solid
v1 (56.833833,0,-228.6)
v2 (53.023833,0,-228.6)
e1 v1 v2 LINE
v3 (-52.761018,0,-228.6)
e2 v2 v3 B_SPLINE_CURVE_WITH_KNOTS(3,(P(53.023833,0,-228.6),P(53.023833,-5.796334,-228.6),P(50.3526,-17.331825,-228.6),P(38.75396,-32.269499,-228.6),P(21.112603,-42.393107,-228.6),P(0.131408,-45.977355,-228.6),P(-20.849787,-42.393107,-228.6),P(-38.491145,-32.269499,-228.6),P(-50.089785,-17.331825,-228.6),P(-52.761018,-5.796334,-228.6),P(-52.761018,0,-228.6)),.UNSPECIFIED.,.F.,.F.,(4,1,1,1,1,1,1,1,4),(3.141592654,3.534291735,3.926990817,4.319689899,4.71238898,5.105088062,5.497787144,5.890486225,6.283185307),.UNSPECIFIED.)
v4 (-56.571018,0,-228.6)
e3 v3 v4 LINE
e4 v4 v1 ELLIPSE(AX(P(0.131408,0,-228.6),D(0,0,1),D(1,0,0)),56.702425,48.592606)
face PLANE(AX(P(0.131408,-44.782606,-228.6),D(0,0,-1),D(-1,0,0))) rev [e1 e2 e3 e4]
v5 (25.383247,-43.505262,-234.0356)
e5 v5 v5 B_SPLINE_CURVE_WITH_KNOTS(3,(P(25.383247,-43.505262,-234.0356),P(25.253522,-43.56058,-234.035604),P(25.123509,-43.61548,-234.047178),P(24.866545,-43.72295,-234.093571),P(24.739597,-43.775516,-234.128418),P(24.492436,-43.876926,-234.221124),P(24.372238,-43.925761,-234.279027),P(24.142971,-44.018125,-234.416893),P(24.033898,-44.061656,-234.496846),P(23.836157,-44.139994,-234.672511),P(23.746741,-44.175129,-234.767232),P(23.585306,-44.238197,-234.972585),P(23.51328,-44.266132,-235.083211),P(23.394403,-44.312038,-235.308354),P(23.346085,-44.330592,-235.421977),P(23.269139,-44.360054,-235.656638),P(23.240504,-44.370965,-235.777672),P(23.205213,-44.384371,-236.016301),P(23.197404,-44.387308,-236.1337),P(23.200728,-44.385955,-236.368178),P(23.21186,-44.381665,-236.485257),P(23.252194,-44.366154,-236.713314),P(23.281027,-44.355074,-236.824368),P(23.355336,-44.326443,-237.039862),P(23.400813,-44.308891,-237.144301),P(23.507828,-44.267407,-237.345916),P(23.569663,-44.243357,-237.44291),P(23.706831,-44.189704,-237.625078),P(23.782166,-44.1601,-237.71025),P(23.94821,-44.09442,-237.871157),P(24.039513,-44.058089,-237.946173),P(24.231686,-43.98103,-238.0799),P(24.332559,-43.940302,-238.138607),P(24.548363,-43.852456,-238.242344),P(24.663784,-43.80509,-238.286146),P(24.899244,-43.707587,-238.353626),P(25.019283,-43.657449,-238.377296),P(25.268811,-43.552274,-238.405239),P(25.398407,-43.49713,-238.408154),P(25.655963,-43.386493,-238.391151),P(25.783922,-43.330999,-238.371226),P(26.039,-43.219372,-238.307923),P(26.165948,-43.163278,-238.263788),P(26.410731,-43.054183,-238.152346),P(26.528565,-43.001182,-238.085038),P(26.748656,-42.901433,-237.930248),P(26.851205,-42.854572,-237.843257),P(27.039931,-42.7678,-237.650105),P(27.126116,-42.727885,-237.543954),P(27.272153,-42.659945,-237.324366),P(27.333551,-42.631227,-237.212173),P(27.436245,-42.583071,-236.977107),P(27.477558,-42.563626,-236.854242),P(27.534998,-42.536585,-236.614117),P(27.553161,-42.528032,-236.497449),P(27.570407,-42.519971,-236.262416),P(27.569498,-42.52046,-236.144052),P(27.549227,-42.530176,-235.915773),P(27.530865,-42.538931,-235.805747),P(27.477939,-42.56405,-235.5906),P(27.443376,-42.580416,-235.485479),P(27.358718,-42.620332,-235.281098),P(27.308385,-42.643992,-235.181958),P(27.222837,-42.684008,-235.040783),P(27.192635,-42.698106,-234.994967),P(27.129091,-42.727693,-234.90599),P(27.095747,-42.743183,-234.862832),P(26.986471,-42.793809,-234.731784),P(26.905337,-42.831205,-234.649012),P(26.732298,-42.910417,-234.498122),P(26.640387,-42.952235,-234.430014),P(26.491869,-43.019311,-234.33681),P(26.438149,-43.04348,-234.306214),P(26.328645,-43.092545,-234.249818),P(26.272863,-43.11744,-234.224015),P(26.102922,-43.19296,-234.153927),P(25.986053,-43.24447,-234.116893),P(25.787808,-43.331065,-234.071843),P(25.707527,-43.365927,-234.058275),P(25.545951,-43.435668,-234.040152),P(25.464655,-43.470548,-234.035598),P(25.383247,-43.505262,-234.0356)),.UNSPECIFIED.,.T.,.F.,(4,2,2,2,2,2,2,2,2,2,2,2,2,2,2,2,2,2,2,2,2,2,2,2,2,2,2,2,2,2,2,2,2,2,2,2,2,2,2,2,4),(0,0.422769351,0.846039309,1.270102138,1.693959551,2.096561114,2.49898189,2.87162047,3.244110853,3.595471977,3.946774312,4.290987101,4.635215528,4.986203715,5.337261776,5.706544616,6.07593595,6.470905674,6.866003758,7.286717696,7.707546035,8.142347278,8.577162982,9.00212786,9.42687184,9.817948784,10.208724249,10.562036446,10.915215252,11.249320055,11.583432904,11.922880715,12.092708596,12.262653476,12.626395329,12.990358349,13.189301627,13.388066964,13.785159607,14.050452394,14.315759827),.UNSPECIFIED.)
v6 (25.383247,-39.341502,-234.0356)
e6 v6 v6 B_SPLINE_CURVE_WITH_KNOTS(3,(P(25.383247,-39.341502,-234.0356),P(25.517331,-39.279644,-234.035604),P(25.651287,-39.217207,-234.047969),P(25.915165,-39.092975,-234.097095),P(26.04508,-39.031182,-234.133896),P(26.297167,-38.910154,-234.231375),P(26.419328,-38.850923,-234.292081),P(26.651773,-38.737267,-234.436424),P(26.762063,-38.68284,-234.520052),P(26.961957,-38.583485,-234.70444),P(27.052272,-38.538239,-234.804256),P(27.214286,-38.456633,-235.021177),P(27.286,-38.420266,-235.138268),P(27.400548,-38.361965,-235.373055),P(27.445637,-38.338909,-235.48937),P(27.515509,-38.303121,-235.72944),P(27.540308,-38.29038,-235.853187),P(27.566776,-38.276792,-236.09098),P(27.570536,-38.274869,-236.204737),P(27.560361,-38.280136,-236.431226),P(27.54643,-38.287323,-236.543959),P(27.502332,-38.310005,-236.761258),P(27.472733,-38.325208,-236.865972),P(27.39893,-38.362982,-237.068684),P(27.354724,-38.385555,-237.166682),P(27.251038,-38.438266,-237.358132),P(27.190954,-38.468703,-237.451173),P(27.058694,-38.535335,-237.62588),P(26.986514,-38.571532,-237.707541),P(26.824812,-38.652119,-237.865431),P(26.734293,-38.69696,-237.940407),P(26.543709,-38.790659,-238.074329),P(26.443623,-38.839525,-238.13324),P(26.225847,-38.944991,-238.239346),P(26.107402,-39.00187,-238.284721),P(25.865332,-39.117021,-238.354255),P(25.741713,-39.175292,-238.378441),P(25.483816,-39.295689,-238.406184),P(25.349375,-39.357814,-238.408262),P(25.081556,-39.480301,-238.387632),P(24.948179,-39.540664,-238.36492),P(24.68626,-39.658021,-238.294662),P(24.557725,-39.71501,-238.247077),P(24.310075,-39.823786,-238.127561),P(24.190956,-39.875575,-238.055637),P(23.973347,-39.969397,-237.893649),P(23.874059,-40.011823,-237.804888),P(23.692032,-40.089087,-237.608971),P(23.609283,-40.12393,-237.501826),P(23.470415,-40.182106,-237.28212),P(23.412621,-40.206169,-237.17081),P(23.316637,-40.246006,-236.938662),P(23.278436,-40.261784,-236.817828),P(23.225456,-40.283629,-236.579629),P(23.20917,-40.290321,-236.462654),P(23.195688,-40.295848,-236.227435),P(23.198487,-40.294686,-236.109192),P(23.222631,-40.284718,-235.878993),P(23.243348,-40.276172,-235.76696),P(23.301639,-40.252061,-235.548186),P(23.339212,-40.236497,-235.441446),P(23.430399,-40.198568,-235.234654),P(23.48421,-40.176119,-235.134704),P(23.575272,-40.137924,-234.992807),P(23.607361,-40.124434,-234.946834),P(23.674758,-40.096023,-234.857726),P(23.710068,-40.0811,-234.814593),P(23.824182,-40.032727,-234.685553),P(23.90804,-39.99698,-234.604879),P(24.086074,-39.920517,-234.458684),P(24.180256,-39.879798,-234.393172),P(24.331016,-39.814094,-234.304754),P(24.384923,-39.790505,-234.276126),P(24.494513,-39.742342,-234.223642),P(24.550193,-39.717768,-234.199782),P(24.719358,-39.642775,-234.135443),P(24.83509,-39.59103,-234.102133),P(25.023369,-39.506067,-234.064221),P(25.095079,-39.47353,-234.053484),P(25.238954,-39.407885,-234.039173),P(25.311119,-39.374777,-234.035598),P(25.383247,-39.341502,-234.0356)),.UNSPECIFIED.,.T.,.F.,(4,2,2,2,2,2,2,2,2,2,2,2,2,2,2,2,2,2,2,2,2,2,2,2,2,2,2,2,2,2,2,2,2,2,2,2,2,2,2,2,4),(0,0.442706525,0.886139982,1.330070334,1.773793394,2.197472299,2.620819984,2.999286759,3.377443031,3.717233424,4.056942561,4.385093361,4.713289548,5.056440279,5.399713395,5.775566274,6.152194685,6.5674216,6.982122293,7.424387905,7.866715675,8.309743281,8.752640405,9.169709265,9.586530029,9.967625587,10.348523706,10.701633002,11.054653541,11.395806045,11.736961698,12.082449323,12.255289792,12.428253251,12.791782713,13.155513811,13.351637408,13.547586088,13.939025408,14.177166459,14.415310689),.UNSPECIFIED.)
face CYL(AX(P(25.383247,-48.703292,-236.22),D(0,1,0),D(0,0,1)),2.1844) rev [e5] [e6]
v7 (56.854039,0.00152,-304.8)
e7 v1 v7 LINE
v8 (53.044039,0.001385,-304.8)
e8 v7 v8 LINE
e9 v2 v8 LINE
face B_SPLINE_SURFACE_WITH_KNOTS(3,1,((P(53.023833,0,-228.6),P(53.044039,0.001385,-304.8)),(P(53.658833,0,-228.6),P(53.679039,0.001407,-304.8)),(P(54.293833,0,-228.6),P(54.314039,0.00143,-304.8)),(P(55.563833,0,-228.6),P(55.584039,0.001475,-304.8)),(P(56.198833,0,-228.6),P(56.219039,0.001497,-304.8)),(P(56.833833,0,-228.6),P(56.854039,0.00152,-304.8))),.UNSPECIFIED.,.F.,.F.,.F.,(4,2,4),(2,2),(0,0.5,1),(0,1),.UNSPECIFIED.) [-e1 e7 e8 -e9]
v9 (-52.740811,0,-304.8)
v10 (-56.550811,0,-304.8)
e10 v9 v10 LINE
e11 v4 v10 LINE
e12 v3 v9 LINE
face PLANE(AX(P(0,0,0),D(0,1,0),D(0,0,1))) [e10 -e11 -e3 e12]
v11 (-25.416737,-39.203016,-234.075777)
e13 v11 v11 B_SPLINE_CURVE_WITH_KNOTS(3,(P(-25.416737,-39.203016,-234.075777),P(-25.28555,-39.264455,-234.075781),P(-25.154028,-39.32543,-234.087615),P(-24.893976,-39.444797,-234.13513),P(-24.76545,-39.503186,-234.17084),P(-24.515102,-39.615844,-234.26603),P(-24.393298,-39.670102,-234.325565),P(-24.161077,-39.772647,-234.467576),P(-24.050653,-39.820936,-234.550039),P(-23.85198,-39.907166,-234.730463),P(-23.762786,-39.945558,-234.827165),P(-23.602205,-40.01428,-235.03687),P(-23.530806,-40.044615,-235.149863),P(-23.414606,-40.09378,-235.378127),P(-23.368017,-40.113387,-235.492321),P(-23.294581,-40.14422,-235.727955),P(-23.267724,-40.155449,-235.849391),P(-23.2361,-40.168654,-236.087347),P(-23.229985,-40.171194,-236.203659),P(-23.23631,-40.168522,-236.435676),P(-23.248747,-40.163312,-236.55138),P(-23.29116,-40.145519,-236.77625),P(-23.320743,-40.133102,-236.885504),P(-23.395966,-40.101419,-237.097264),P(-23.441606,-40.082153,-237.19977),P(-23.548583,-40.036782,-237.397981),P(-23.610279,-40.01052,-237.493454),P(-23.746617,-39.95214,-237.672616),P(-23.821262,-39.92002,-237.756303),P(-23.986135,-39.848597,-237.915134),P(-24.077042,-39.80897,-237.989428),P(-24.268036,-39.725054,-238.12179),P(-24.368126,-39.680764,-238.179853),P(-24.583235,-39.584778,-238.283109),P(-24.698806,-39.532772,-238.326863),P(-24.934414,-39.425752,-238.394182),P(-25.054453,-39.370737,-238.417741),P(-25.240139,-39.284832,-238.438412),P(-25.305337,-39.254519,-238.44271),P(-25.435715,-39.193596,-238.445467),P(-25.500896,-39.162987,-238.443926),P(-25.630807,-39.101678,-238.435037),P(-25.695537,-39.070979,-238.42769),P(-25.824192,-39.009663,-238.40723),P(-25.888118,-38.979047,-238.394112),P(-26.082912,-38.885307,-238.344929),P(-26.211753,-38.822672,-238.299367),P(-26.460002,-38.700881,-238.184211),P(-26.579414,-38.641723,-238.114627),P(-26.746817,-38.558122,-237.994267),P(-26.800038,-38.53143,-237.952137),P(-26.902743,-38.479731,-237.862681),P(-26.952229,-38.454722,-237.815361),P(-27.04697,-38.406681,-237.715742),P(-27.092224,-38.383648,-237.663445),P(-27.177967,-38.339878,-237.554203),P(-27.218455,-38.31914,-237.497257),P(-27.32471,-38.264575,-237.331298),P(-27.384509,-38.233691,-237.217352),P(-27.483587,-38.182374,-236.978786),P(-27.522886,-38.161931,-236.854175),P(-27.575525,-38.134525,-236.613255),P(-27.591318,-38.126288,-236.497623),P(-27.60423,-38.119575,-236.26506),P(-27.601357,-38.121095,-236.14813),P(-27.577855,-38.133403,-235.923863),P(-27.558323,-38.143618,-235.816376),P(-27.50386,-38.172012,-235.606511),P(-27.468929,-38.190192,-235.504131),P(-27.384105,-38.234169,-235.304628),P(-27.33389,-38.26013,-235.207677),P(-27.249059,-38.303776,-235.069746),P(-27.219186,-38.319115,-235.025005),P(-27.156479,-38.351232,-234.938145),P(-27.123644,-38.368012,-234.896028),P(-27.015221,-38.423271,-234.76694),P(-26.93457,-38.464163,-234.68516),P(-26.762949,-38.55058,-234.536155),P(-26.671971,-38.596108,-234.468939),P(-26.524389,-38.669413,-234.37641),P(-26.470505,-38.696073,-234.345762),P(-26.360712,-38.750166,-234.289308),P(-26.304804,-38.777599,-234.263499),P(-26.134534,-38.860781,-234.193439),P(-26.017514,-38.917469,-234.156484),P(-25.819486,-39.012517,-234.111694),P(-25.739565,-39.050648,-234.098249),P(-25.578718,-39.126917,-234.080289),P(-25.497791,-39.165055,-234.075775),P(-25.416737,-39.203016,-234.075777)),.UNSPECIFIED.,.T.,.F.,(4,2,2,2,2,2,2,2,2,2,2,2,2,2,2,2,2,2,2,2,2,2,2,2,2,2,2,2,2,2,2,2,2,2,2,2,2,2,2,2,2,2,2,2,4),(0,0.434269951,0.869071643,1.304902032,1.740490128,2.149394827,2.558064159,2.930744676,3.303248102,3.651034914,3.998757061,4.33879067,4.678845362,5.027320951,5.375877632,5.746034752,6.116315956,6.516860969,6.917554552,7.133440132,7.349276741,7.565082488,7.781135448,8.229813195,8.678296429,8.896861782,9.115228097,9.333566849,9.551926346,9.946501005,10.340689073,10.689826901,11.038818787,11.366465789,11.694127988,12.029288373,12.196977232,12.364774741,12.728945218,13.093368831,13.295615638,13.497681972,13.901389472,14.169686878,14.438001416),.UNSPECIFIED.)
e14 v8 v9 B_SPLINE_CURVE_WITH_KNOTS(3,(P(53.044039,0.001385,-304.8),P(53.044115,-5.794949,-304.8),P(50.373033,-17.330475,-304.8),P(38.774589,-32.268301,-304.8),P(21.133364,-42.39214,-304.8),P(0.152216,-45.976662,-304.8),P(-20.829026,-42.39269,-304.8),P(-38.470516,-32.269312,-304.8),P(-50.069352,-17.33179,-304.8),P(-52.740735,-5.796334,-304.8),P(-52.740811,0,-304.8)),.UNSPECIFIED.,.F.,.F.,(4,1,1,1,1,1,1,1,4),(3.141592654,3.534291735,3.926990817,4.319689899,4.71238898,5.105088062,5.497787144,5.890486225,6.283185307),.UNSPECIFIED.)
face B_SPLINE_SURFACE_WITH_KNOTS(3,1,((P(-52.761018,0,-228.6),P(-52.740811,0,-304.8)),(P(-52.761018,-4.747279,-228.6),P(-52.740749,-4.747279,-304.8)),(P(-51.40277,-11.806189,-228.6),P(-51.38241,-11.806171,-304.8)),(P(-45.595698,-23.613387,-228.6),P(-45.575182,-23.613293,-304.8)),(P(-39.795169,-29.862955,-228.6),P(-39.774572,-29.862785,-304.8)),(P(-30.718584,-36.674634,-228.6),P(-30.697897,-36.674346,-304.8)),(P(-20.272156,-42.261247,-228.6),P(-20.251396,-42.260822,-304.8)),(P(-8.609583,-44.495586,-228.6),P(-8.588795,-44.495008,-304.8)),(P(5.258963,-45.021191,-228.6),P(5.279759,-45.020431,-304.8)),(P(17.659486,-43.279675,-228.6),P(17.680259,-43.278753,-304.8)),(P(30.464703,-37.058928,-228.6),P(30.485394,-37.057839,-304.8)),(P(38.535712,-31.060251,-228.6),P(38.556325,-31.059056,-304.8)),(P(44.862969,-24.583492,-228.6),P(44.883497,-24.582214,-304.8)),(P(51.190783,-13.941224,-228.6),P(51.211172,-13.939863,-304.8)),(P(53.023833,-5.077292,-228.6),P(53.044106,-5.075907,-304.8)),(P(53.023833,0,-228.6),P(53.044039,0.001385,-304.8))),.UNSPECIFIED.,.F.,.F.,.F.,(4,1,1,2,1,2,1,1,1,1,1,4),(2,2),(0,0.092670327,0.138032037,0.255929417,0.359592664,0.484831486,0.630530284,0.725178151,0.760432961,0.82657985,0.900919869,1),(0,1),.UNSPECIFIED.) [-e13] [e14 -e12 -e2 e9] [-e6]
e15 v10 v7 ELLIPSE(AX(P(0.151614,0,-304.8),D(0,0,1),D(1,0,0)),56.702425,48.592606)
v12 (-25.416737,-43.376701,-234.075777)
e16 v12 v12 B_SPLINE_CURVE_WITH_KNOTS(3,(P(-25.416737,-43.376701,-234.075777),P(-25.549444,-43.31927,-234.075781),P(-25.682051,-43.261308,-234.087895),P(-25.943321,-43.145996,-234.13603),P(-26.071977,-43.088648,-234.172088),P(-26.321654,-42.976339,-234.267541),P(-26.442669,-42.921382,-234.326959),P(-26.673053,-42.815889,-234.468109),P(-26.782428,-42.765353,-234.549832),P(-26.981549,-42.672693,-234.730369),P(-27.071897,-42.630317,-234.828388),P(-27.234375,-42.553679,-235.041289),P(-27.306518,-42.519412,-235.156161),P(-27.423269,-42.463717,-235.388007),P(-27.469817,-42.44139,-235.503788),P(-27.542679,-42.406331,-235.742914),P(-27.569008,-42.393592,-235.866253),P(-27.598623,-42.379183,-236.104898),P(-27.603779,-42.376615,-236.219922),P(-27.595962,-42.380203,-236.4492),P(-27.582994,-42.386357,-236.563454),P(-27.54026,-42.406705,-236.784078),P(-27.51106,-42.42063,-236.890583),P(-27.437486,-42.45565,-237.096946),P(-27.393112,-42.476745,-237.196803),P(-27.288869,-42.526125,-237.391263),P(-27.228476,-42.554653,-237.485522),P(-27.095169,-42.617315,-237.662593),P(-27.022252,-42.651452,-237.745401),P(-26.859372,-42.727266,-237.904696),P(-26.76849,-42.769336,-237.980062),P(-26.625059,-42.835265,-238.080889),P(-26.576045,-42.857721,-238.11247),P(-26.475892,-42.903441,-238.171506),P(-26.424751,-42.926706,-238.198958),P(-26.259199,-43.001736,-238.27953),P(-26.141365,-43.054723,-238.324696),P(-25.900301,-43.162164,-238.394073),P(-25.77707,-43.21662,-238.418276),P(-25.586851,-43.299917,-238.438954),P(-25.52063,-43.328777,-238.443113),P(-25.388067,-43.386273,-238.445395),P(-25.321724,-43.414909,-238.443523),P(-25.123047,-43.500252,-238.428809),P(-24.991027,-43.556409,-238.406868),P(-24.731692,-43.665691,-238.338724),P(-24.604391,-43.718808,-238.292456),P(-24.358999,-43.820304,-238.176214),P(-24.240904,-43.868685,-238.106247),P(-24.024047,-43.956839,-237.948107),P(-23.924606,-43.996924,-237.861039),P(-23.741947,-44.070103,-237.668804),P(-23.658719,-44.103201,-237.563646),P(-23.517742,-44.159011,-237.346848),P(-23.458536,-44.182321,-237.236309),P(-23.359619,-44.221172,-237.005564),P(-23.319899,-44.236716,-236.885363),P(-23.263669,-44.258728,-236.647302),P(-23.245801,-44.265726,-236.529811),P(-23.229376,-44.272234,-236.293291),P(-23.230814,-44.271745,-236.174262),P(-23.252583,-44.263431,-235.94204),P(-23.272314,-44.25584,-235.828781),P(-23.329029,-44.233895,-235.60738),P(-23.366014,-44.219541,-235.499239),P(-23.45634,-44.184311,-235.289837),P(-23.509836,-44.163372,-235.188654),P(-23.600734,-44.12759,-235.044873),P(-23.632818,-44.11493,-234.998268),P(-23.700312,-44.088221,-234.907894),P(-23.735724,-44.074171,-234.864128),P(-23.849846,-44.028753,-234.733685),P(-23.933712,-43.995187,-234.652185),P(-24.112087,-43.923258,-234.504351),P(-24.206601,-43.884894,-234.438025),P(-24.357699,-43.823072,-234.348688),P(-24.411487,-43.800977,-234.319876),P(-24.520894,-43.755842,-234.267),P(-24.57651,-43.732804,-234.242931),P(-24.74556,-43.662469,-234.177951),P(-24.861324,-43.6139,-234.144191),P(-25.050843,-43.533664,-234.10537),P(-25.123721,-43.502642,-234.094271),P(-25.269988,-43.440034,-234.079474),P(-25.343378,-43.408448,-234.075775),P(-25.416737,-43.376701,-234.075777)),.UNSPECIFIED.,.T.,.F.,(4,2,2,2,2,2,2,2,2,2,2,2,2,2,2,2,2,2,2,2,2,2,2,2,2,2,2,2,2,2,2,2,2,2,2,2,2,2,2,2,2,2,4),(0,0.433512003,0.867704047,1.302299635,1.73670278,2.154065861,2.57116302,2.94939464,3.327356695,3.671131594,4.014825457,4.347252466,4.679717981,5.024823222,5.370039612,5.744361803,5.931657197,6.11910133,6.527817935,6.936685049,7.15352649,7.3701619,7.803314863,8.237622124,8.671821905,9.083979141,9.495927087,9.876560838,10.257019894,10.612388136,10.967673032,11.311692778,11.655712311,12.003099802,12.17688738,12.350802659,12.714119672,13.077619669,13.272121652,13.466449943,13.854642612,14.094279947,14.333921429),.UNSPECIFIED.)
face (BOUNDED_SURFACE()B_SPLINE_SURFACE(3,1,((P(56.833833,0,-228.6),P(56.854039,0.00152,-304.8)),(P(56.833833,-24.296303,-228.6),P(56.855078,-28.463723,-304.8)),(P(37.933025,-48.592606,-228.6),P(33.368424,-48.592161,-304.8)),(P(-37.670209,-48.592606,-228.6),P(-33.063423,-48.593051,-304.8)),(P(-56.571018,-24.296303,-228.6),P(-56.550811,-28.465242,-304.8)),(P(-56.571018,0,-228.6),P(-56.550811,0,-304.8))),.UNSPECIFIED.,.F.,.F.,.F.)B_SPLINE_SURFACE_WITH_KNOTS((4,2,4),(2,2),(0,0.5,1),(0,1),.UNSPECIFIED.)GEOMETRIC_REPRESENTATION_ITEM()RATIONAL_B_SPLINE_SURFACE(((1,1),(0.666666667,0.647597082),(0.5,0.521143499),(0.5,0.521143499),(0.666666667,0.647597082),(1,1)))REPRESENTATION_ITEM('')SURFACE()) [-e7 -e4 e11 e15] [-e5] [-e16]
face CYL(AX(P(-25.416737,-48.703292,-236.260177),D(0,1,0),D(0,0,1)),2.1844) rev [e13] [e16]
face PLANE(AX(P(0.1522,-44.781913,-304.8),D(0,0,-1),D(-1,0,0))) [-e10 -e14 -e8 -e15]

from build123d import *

# Parameters (mm, degrees)
SKETCH18_R         = 2.1844
CUT_EXTRUDE1_DEPTH = 314.841780485


with BuildPart() as part:
    # Loft1: read off the stored shape, not the designer's step
    # Loft1: loft between two sections, ruled curve by curve
    loft1_from = [
        Edge.make_bspline([(56.833832956, 0, -228.6), (56.833832956, -24.296302856, -228.6), (37.93302454, -48.592605712, -228.6), (-37.670209127, -48.592605712, -228.6), (-56.571017544, -24.296302856, -228.6), (-56.571017544, 0, -228.6)], [0, 0, 0, 0, 0.5, 0.5, 1, 1, 1, 1], 3, [1, 0.666666667, 0.5, 0.5, 0.666666667, 1]),
        Edge.make_bspline([(-52.761017544, 0, -228.6), (-52.761017544, -4.747279447, -228.6), (-51.402770393, -11.806188932, -228.6), (-45.595697561, -23.613386766, -228.6), (-39.795169121, -29.862955228, -228.6), (-30.718583767, -36.674634262, -228.6), (-20.272155915, -42.261246959, -228.6), (-8.609583282, -44.495586175, -228.6), (5.258963144, -45.021190556, -228.6), (17.65948625, -43.279675379, -228.6), (30.464702909, -37.058928058, -228.6), (38.535712181, -31.060250812, -228.6), (44.862969288, -24.583491802, -228.6), (51.190783343, -13.941223772, -228.6), (53.023832956, -5.077291503, -228.6), (53.023832956, 0, -228.6)], [0, 0, 0, 0, 0.092670327, 0.138032037, 0.255929417, 0.255929417, 0.359592664, 0.484831486, 0.484831486, 0.630530284, 0.725178151, 0.760432961, 0.82657985, 0.900919869, 1, 1, 1, 1], 3),
        Edge.make_bspline([(53.023832956, 0, -228.6), (53.658832956, 0, -228.6), (54.293832956, 0, -228.6), (55.563832956, 0, -228.6), (56.198832956, 0, -228.6), (56.833832956, 0, -228.6)], [0, 0, 0, 0, 0.5, 0.5, 1, 1, 1, 1], 3),
        Edge.make_line((-52.761017544, 0, -228.6), (-56.571017544, 0, -228.6)),
    ]
    loft1_to = [
        Edge.make_bspline([(56.854039108, 0.001519688, -304.8), (56.855077905, -28.463722616, -304.8), (33.368424055, -48.592160594, -304.8), (-33.063422969, -48.593050818, -304.8), (-56.550811364, -28.465242318, -304.8), (-56.550811364, 0, -304.8)], [0, 0, 0, 0, 0.5, 0.5, 1, 1, 1, 1], 3, [1, 0.647597082, 0.521143499, 0.521143499, 0.647597082, 1]),
        Edge.make_bspline([(-52.740811364, 0, -304.8), (-52.740749216, -4.747279446, -304.8), (-51.382409655, -11.80617115, -304.8), (-45.575182253, -23.613292961, -304.8), (-39.774571999, -29.862785486, -304.8), (-30.697897472, -36.674345695, -304.8), (-20.251396485, -42.260821635, -304.8), (-8.588794603, -44.495008174, -304.8), (5.279758702, -45.020430998, -304.8), (17.680259009, -43.278753482, -304.8), (30.485394229, -37.057838525, -304.8), (38.556324971, -31.059055621, -304.8), (44.883497288, -24.582213779, -304.8), (51.211172022, -13.939862911, -304.8), (53.044105595, -5.075906646, -304.8), (53.044039127, 0.001384857, -304.8)], [0, 0, 0, 0, 0.092670327, 0.138032037, 0.255929417, 0.255929417, 0.359592664, 0.484831486, 0.484831486, 0.630530284, 0.725178151, 0.760432961, 0.82657985, 0.900919869, 1, 1, 1, 1], 3),
        Edge.make_bspline([(53.044039127, 0.001384857, -304.8), (53.679039124, 0.001407329, -304.8), (54.31403912, 0.001429801, -304.8), (55.584039114, 0.001474744, -304.8), (56.219039111, 0.001497216, -304.8), (56.854039108, 0.001519688, -304.8)], [0, 0, 0, 0, 0.5, 0.5, 1, 1, 1, 1], 3),
        Edge.make_line((-52.740811364, 0, -304.8), (-56.550811364, 0, -304.8)),
    ]
    loft1 = Solid(Shell([*[Face.make_surface_from_curves(loft1_from[k], loft1_to[k]) for k in range(4)], Face(Wire(loft1_from)), Face(Wire(loft1_to))]))
    add(loft1)

    # Sketch18 → Cut-Extrude1 (cut, through all)
    with BuildSketch(Plane(origin=(0, 0, 0), x_dir=(1, 0, 0), z_dir=(0, 1, 0))):
        with Locations(Location((25.383246846, 236.22, 0), (0, 0, 270))):
            Circle(SKETCH18_R)
        with Locations(Location((-25.416737266, 236.260177413, 0), (0, 0, 270))):
            Circle(SKETCH18_R)
    extrude(amount=-CUT_EXTRUDE1_DEPTH, mode=Mode.SUBTRACT)


solid = part.part
